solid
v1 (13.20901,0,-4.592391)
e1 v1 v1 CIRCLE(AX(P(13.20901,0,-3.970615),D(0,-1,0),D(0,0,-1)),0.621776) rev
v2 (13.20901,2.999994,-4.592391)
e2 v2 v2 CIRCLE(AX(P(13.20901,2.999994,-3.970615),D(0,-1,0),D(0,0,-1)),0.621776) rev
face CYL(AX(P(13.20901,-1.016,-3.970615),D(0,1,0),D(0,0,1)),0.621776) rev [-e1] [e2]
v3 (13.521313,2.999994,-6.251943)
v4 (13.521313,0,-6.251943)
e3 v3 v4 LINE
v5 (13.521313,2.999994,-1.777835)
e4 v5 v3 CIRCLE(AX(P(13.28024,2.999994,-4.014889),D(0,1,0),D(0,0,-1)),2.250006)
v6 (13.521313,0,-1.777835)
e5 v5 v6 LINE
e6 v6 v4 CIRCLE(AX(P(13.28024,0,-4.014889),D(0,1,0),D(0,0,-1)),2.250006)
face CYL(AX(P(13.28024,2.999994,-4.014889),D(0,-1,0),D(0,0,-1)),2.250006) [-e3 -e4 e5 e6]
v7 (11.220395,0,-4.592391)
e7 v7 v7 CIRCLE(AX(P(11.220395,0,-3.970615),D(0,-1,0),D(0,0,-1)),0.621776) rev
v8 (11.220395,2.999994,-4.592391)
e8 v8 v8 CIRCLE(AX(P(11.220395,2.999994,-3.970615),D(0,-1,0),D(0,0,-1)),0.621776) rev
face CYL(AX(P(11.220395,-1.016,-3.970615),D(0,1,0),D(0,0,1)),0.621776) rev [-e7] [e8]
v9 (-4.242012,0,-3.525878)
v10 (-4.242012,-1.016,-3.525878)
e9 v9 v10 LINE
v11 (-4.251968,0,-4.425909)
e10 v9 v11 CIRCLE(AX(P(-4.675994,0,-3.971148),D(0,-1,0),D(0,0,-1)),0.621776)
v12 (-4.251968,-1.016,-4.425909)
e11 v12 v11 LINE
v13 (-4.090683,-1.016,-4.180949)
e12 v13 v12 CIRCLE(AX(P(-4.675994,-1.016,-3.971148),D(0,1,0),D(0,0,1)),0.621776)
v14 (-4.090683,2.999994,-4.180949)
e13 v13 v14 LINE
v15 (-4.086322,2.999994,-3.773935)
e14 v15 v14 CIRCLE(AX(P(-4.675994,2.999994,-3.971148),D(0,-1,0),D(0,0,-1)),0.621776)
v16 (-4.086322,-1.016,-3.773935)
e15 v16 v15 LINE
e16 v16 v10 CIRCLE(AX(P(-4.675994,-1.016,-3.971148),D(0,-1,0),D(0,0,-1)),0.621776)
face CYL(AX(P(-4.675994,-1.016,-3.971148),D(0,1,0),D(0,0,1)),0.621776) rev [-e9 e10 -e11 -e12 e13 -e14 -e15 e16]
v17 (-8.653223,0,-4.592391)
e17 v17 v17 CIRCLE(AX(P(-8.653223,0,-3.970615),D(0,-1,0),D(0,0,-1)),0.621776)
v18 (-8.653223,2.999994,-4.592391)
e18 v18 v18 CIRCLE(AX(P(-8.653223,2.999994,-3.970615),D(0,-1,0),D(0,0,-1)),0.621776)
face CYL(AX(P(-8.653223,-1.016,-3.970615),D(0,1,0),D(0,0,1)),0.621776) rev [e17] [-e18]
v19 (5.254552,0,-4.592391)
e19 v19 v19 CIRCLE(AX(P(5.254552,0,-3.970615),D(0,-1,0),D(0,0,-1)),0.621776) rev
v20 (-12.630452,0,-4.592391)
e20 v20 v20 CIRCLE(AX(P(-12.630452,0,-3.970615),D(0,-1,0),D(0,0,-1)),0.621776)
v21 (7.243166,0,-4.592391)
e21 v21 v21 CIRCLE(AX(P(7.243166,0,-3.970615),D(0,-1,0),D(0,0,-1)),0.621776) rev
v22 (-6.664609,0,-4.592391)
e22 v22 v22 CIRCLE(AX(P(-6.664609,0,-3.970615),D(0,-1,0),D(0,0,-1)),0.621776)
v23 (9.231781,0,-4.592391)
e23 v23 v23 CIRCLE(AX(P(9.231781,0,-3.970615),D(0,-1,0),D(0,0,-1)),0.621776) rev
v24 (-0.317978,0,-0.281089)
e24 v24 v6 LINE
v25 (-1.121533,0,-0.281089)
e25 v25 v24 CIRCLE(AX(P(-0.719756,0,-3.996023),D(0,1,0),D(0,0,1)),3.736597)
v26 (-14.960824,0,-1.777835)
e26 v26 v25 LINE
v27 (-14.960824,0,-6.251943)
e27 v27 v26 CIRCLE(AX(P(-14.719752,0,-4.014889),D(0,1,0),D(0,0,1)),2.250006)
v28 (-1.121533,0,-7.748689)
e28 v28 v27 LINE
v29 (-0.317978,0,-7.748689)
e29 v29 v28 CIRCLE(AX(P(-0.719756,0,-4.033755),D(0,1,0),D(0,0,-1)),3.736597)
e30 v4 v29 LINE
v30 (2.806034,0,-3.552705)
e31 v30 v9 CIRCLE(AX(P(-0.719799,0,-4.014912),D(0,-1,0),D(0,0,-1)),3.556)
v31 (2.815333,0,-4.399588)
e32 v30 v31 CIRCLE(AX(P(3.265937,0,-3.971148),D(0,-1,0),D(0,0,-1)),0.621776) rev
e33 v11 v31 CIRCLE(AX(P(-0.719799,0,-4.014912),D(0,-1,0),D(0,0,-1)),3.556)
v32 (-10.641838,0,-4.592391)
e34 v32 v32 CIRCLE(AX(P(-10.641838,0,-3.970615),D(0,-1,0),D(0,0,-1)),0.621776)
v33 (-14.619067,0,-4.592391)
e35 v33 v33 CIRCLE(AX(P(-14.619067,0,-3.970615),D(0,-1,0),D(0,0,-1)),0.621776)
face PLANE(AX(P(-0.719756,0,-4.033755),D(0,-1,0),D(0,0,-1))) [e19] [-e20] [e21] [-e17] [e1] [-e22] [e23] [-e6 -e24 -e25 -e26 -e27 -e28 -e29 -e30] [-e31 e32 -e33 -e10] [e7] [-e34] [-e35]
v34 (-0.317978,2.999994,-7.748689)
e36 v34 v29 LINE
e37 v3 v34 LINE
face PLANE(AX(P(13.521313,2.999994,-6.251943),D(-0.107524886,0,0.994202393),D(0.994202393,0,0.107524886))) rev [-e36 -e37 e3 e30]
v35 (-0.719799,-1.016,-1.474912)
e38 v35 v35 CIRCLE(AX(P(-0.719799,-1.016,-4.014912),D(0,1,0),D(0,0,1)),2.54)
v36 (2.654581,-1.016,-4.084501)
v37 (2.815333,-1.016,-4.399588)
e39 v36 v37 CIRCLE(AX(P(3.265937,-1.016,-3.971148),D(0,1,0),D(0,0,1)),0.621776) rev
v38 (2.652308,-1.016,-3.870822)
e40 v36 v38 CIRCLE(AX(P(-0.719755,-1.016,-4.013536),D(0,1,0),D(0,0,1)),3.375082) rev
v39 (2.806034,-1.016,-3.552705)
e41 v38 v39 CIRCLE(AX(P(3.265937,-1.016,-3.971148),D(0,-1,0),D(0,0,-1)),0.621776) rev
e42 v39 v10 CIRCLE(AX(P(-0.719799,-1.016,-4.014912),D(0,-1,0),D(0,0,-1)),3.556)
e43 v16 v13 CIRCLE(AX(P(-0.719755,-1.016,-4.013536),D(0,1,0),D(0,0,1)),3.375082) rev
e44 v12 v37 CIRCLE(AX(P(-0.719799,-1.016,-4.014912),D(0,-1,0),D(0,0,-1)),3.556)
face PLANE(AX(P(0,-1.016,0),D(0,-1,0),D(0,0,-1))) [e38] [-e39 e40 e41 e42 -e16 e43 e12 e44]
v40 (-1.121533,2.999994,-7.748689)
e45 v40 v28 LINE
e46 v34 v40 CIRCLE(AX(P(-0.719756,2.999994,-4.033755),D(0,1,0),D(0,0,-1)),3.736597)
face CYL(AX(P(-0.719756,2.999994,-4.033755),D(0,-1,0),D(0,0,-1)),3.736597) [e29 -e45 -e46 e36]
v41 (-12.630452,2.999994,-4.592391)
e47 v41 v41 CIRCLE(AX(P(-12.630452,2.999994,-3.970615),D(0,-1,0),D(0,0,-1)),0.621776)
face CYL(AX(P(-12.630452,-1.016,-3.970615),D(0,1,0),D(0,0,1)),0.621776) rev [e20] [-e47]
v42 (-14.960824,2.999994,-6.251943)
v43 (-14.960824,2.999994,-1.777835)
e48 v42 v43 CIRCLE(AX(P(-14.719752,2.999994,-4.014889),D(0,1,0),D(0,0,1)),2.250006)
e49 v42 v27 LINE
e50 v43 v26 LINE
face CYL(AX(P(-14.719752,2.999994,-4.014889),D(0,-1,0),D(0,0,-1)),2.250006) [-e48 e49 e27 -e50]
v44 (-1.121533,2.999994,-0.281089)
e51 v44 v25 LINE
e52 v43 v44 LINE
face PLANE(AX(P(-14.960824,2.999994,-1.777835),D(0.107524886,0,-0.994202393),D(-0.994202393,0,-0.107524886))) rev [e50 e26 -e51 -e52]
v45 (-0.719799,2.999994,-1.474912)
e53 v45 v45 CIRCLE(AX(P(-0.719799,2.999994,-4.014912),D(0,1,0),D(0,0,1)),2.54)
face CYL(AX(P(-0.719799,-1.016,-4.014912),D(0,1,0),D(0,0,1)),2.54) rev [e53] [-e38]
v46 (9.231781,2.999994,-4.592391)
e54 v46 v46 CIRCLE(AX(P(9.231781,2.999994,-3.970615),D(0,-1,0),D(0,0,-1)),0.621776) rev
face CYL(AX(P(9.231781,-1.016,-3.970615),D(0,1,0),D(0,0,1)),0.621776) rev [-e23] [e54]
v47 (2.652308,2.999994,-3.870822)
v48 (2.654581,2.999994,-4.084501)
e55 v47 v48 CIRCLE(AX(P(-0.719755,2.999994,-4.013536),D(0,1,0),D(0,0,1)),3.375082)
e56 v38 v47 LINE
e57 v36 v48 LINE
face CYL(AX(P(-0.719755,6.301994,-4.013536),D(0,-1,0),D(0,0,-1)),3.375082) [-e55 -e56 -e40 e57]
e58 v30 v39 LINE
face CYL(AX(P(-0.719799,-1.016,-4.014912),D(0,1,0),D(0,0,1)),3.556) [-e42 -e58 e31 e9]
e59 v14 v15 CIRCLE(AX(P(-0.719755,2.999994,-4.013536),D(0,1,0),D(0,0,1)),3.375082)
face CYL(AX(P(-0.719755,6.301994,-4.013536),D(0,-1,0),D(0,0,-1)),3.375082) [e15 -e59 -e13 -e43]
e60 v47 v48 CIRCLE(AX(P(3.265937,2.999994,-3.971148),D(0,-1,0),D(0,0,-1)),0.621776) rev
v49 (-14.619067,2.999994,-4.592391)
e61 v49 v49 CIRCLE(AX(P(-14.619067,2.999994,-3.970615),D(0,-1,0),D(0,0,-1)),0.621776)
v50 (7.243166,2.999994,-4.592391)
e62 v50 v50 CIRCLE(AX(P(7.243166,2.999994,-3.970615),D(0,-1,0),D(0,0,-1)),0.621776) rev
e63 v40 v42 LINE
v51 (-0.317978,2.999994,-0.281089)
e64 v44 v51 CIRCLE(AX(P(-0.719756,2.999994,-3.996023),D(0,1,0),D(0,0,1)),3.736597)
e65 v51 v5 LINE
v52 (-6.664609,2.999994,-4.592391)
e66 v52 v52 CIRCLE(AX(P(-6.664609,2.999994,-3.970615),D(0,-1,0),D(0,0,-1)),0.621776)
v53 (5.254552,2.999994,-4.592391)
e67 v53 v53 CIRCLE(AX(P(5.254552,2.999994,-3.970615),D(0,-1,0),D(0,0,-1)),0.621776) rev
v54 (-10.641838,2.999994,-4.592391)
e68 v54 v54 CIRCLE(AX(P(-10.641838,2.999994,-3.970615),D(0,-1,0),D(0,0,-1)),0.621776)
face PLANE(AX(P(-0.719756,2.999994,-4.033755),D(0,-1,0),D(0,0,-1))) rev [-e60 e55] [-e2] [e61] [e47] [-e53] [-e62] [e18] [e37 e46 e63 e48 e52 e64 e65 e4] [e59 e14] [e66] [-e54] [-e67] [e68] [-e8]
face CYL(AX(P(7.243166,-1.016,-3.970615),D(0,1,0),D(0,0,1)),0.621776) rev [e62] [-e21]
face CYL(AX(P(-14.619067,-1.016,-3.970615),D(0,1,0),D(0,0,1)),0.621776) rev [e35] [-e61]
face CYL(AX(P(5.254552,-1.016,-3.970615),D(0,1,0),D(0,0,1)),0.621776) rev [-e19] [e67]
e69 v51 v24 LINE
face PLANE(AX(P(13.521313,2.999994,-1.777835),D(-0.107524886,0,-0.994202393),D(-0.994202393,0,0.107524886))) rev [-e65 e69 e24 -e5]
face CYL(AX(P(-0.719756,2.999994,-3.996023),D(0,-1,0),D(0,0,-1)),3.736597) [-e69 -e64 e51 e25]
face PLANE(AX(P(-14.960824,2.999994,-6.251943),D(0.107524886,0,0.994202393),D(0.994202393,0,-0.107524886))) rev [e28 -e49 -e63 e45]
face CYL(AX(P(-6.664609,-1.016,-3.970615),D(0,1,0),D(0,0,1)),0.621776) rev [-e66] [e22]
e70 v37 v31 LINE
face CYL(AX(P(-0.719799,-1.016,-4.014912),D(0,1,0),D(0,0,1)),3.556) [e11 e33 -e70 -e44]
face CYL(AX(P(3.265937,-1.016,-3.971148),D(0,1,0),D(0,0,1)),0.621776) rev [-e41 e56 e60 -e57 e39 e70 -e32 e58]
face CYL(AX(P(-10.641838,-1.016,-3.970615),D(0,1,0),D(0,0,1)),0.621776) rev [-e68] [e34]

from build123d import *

# Parameters (mm, degrees)
BOSS_EXTRUDE1_DEPTH     = 2.999994
SKETCH3_R               = 3.375082345
SKETCH3_R_2             = 2.3700486
BOSS_EXTRUDE2_DEPTH     = 3.302
SKETCH4_R               = 2.3700486
SKETCH4_R_2             = 1.524
BOSS_EXTRUDE3_DEPTH     = 2.237994
SKETCH5_R               = 3.556
SKETCH5_R_2             = 1.524049463
BOSS_EXTRUDE4_DEPTH     = 1.016
SKETCH6_R               = 1.524049463
CUT_EXTRUDE2_DEPTH      = 20.69939547
CUT_EXTRUDE3_START      = -4.015994
CUT_EXTRUDE3_OUTLINE_R  = 0.621776252
CUT_EXTRUDE3_DEPTH      = 4.015994
CUT_EXTRUDE4_DEPTH      = 21.047545727
CUT_EXTRUDE4_DEPTH_BACK = 3.302
SKETCH9_R               = 3.375082345
SKETCH10_R              = 2.54
CUT_EXTRUDE5_DEPTH      = 20.091339956


# Read off the part's stored shape, not the designer's step: Cut-Extrude3
with BuildPart() as part:
    # Sketch1 → Boss-Extrude1 (new body)
    with BuildSketch(Plane(origin=(0, 0, 0), x_dir=(1, 0, 0), z_dir=(0, 1, 0))):
        with BuildLine():
            Line((-14.960824333, 6.251943389), (-1.121532733, 7.748689189))
            ThreePointArc((-1.121532733, 7.748689189), (-0.719755533, 7.770352511), (-0.317978333, 7.748689189))
            Line((-0.317978333, 7.748689189), (13.521313267, 6.251943389))
            ThreePointArc((13.521313267, 6.251943389), (15.530246603, 4.014889189), (13.521313267, 1.777834989))
            Line((13.521313267, 1.777834989), (-0.317978333, 0.281089189))
            ThreePointArc((-0.317978333, 0.281089189), (-0.719755533, 0.259425867), (-1.121532733, 0.281089189))
            Line((-1.121532733, 0.281089189), (-14.960824333, 1.777834989))
            ThreePointArc((-14.960824333, 1.777834989), (-16.96975767, 4.014889189), (-14.960824333, 6.251943389))
        make_face()
    extrude(amount=BOSS_EXTRUDE1_DEPTH)

    # Sketch3 → Boss-Extrude2 (add)
    with BuildSketch(Plane(origin=(0, 2.999994, 0), x_dir=(1, 0, 0), z_dir=(0, 1, 0))):
        with Locations(Location((-0.719755307, 4.013536412, 0), (0, 0, 90))):
            Circle(SKETCH3_R)
        with Locations(Location((-0.719755307, 4.013536412, 0), (0, 0, 90))):
            Circle(SKETCH3_R_2, mode=Mode.SUBTRACT)
    extrude(amount=BOSS_EXTRUDE2_DEPTH)

    # Sketch4 → Boss-Extrude3 (add)
    with BuildSketch(Plane.XZ):
        with Locations(Location((-0.719755307, -4.013536412, 0), (0, 0, 270))):
            Circle(SKETCH4_R)
        with Locations((-0.719755307, -4.013536412)):
            Circle(SKETCH4_R_2, mode=Mode.SUBTRACT)
    extrude(amount=-BOSS_EXTRUDE3_DEPTH)

    # Sketch5 → Boss-Extrude4 (add)
    with BuildSketch(Plane.XZ):
        with Locations(Location((-0.7197993, -4.014912249, 0), (0, 0, 270))):
            Circle(SKETCH5_R)
        with Locations(Location((-0.7197993, -4.014912249, 0), (0, 0, 270))):
            Circle(SKETCH5_R_2, mode=Mode.SUBTRACT)
    extrude(amount=BOSS_EXTRUDE4_DEPTH)

    # Sketch6 → Cut-Extrude2 (cut, through all)
    with BuildSketch(Plane.XZ):
        with Locations(Location((-0.7197993, -4.014912249, 0), (0, 0, 270))):
            Circle(SKETCH6_R)
    extrude(amount=-CUT_EXTRUDE2_DEPTH, mode=Mode.SUBTRACT)

    # Cut-Extrude3 outline → Cut-Extrude3 (cut)
    with BuildSketch(Plane(origin=(0, 2.999994, 0), x_dir=(1, 0, 0), z_dir=(0, 1, 0)).offset(CUT_EXTRUDE3_START)):
        with BuildLine():
            ThreePointArc((-4.086322125, 3.773935294), (-4.094643941, 3.977376451), (-4.090683041, 4.18094921))
            ThreePointArc((-4.090683041, 4.18094921), (-5.297734637, 3.964486038), (-4.086322125, 3.773935294))
        make_face()
        with BuildLine():
            ThreePointArc((2.654580903, 4.084501036), (2.655136179, 3.977643639), (2.652308378, 3.870822222))
            ThreePointArc((2.652308378, 3.870822222), (3.887678446, 3.964535259), (2.654580903, 4.084501036))
        make_face()
        with Locations((-6.664608508, 3.970614789)):
            Circle(CUT_EXTRUDE3_OUTLINE_R)
        with Locations((9.231780819, 3.970614789)):
            Circle(CUT_EXTRUDE3_OUTLINE_R)
        with Locations((11.220395333, 3.970614789)):
            Circle(CUT_EXTRUDE3_OUTLINE_R)
        with Locations((13.209009847, 3.970614789)):
            Circle(CUT_EXTRUDE3_OUTLINE_R)
        with Locations((7.243166305, 3.970614789)):
            Circle(CUT_EXTRUDE3_OUTLINE_R)
        with Locations((5.254551791, 3.970614789)):
            Circle(CUT_EXTRUDE3_OUTLINE_R)
        with Locations((-14.619066564, 3.970614789)):
            Circle(CUT_EXTRUDE3_OUTLINE_R)
        with Locations((-12.63045205, 3.970614789)):
            Circle(CUT_EXTRUDE3_OUTLINE_R)
        with Locations((-10.641837536, 3.970614789)):
            Circle(CUT_EXTRUDE3_OUTLINE_R)
        with Locations((-8.653223022, 3.970614789)):
            Circle(CUT_EXTRUDE3_OUTLINE_R)
    extrude(amount=CUT_EXTRUDE3_DEPTH, mode=Mode.SUBTRACT)

    # Sketch9 → Cut-Extrude4 (cut, two sides: drawn at the far end of the back side and taken through both)
    with BuildSketch(Plane(origin=(0, 6.301994, 0), x_dir=(1, 0, 0), z_dir=(0, 1, 0)).offset(-CUT_EXTRUDE4_DEPTH_BACK)):
        with Locations((-0.719755307, 4.013536412)):
            Circle(SKETCH9_R)
    extrude(amount=CUT_EXTRUDE4_DEPTH + CUT_EXTRUDE4_DEPTH_BACK, mode=Mode.SUBTRACT)

    # Sketch10 → Cut-Extrude5 (cut, through all)
    with BuildSketch(Plane(origin=(0, 2.999994, 0), x_dir=(1, 0, 0), z_dir=(0, 1, 0))):
        with Locations(Location((-0.7197993, 4.014912249, 0), (0, 0, 270))):
            Circle(SKETCH10_R)
    extrude(amount=-CUT_EXTRUDE5_DEPTH, mode=Mode.SUBTRACT)


solid = part.part
